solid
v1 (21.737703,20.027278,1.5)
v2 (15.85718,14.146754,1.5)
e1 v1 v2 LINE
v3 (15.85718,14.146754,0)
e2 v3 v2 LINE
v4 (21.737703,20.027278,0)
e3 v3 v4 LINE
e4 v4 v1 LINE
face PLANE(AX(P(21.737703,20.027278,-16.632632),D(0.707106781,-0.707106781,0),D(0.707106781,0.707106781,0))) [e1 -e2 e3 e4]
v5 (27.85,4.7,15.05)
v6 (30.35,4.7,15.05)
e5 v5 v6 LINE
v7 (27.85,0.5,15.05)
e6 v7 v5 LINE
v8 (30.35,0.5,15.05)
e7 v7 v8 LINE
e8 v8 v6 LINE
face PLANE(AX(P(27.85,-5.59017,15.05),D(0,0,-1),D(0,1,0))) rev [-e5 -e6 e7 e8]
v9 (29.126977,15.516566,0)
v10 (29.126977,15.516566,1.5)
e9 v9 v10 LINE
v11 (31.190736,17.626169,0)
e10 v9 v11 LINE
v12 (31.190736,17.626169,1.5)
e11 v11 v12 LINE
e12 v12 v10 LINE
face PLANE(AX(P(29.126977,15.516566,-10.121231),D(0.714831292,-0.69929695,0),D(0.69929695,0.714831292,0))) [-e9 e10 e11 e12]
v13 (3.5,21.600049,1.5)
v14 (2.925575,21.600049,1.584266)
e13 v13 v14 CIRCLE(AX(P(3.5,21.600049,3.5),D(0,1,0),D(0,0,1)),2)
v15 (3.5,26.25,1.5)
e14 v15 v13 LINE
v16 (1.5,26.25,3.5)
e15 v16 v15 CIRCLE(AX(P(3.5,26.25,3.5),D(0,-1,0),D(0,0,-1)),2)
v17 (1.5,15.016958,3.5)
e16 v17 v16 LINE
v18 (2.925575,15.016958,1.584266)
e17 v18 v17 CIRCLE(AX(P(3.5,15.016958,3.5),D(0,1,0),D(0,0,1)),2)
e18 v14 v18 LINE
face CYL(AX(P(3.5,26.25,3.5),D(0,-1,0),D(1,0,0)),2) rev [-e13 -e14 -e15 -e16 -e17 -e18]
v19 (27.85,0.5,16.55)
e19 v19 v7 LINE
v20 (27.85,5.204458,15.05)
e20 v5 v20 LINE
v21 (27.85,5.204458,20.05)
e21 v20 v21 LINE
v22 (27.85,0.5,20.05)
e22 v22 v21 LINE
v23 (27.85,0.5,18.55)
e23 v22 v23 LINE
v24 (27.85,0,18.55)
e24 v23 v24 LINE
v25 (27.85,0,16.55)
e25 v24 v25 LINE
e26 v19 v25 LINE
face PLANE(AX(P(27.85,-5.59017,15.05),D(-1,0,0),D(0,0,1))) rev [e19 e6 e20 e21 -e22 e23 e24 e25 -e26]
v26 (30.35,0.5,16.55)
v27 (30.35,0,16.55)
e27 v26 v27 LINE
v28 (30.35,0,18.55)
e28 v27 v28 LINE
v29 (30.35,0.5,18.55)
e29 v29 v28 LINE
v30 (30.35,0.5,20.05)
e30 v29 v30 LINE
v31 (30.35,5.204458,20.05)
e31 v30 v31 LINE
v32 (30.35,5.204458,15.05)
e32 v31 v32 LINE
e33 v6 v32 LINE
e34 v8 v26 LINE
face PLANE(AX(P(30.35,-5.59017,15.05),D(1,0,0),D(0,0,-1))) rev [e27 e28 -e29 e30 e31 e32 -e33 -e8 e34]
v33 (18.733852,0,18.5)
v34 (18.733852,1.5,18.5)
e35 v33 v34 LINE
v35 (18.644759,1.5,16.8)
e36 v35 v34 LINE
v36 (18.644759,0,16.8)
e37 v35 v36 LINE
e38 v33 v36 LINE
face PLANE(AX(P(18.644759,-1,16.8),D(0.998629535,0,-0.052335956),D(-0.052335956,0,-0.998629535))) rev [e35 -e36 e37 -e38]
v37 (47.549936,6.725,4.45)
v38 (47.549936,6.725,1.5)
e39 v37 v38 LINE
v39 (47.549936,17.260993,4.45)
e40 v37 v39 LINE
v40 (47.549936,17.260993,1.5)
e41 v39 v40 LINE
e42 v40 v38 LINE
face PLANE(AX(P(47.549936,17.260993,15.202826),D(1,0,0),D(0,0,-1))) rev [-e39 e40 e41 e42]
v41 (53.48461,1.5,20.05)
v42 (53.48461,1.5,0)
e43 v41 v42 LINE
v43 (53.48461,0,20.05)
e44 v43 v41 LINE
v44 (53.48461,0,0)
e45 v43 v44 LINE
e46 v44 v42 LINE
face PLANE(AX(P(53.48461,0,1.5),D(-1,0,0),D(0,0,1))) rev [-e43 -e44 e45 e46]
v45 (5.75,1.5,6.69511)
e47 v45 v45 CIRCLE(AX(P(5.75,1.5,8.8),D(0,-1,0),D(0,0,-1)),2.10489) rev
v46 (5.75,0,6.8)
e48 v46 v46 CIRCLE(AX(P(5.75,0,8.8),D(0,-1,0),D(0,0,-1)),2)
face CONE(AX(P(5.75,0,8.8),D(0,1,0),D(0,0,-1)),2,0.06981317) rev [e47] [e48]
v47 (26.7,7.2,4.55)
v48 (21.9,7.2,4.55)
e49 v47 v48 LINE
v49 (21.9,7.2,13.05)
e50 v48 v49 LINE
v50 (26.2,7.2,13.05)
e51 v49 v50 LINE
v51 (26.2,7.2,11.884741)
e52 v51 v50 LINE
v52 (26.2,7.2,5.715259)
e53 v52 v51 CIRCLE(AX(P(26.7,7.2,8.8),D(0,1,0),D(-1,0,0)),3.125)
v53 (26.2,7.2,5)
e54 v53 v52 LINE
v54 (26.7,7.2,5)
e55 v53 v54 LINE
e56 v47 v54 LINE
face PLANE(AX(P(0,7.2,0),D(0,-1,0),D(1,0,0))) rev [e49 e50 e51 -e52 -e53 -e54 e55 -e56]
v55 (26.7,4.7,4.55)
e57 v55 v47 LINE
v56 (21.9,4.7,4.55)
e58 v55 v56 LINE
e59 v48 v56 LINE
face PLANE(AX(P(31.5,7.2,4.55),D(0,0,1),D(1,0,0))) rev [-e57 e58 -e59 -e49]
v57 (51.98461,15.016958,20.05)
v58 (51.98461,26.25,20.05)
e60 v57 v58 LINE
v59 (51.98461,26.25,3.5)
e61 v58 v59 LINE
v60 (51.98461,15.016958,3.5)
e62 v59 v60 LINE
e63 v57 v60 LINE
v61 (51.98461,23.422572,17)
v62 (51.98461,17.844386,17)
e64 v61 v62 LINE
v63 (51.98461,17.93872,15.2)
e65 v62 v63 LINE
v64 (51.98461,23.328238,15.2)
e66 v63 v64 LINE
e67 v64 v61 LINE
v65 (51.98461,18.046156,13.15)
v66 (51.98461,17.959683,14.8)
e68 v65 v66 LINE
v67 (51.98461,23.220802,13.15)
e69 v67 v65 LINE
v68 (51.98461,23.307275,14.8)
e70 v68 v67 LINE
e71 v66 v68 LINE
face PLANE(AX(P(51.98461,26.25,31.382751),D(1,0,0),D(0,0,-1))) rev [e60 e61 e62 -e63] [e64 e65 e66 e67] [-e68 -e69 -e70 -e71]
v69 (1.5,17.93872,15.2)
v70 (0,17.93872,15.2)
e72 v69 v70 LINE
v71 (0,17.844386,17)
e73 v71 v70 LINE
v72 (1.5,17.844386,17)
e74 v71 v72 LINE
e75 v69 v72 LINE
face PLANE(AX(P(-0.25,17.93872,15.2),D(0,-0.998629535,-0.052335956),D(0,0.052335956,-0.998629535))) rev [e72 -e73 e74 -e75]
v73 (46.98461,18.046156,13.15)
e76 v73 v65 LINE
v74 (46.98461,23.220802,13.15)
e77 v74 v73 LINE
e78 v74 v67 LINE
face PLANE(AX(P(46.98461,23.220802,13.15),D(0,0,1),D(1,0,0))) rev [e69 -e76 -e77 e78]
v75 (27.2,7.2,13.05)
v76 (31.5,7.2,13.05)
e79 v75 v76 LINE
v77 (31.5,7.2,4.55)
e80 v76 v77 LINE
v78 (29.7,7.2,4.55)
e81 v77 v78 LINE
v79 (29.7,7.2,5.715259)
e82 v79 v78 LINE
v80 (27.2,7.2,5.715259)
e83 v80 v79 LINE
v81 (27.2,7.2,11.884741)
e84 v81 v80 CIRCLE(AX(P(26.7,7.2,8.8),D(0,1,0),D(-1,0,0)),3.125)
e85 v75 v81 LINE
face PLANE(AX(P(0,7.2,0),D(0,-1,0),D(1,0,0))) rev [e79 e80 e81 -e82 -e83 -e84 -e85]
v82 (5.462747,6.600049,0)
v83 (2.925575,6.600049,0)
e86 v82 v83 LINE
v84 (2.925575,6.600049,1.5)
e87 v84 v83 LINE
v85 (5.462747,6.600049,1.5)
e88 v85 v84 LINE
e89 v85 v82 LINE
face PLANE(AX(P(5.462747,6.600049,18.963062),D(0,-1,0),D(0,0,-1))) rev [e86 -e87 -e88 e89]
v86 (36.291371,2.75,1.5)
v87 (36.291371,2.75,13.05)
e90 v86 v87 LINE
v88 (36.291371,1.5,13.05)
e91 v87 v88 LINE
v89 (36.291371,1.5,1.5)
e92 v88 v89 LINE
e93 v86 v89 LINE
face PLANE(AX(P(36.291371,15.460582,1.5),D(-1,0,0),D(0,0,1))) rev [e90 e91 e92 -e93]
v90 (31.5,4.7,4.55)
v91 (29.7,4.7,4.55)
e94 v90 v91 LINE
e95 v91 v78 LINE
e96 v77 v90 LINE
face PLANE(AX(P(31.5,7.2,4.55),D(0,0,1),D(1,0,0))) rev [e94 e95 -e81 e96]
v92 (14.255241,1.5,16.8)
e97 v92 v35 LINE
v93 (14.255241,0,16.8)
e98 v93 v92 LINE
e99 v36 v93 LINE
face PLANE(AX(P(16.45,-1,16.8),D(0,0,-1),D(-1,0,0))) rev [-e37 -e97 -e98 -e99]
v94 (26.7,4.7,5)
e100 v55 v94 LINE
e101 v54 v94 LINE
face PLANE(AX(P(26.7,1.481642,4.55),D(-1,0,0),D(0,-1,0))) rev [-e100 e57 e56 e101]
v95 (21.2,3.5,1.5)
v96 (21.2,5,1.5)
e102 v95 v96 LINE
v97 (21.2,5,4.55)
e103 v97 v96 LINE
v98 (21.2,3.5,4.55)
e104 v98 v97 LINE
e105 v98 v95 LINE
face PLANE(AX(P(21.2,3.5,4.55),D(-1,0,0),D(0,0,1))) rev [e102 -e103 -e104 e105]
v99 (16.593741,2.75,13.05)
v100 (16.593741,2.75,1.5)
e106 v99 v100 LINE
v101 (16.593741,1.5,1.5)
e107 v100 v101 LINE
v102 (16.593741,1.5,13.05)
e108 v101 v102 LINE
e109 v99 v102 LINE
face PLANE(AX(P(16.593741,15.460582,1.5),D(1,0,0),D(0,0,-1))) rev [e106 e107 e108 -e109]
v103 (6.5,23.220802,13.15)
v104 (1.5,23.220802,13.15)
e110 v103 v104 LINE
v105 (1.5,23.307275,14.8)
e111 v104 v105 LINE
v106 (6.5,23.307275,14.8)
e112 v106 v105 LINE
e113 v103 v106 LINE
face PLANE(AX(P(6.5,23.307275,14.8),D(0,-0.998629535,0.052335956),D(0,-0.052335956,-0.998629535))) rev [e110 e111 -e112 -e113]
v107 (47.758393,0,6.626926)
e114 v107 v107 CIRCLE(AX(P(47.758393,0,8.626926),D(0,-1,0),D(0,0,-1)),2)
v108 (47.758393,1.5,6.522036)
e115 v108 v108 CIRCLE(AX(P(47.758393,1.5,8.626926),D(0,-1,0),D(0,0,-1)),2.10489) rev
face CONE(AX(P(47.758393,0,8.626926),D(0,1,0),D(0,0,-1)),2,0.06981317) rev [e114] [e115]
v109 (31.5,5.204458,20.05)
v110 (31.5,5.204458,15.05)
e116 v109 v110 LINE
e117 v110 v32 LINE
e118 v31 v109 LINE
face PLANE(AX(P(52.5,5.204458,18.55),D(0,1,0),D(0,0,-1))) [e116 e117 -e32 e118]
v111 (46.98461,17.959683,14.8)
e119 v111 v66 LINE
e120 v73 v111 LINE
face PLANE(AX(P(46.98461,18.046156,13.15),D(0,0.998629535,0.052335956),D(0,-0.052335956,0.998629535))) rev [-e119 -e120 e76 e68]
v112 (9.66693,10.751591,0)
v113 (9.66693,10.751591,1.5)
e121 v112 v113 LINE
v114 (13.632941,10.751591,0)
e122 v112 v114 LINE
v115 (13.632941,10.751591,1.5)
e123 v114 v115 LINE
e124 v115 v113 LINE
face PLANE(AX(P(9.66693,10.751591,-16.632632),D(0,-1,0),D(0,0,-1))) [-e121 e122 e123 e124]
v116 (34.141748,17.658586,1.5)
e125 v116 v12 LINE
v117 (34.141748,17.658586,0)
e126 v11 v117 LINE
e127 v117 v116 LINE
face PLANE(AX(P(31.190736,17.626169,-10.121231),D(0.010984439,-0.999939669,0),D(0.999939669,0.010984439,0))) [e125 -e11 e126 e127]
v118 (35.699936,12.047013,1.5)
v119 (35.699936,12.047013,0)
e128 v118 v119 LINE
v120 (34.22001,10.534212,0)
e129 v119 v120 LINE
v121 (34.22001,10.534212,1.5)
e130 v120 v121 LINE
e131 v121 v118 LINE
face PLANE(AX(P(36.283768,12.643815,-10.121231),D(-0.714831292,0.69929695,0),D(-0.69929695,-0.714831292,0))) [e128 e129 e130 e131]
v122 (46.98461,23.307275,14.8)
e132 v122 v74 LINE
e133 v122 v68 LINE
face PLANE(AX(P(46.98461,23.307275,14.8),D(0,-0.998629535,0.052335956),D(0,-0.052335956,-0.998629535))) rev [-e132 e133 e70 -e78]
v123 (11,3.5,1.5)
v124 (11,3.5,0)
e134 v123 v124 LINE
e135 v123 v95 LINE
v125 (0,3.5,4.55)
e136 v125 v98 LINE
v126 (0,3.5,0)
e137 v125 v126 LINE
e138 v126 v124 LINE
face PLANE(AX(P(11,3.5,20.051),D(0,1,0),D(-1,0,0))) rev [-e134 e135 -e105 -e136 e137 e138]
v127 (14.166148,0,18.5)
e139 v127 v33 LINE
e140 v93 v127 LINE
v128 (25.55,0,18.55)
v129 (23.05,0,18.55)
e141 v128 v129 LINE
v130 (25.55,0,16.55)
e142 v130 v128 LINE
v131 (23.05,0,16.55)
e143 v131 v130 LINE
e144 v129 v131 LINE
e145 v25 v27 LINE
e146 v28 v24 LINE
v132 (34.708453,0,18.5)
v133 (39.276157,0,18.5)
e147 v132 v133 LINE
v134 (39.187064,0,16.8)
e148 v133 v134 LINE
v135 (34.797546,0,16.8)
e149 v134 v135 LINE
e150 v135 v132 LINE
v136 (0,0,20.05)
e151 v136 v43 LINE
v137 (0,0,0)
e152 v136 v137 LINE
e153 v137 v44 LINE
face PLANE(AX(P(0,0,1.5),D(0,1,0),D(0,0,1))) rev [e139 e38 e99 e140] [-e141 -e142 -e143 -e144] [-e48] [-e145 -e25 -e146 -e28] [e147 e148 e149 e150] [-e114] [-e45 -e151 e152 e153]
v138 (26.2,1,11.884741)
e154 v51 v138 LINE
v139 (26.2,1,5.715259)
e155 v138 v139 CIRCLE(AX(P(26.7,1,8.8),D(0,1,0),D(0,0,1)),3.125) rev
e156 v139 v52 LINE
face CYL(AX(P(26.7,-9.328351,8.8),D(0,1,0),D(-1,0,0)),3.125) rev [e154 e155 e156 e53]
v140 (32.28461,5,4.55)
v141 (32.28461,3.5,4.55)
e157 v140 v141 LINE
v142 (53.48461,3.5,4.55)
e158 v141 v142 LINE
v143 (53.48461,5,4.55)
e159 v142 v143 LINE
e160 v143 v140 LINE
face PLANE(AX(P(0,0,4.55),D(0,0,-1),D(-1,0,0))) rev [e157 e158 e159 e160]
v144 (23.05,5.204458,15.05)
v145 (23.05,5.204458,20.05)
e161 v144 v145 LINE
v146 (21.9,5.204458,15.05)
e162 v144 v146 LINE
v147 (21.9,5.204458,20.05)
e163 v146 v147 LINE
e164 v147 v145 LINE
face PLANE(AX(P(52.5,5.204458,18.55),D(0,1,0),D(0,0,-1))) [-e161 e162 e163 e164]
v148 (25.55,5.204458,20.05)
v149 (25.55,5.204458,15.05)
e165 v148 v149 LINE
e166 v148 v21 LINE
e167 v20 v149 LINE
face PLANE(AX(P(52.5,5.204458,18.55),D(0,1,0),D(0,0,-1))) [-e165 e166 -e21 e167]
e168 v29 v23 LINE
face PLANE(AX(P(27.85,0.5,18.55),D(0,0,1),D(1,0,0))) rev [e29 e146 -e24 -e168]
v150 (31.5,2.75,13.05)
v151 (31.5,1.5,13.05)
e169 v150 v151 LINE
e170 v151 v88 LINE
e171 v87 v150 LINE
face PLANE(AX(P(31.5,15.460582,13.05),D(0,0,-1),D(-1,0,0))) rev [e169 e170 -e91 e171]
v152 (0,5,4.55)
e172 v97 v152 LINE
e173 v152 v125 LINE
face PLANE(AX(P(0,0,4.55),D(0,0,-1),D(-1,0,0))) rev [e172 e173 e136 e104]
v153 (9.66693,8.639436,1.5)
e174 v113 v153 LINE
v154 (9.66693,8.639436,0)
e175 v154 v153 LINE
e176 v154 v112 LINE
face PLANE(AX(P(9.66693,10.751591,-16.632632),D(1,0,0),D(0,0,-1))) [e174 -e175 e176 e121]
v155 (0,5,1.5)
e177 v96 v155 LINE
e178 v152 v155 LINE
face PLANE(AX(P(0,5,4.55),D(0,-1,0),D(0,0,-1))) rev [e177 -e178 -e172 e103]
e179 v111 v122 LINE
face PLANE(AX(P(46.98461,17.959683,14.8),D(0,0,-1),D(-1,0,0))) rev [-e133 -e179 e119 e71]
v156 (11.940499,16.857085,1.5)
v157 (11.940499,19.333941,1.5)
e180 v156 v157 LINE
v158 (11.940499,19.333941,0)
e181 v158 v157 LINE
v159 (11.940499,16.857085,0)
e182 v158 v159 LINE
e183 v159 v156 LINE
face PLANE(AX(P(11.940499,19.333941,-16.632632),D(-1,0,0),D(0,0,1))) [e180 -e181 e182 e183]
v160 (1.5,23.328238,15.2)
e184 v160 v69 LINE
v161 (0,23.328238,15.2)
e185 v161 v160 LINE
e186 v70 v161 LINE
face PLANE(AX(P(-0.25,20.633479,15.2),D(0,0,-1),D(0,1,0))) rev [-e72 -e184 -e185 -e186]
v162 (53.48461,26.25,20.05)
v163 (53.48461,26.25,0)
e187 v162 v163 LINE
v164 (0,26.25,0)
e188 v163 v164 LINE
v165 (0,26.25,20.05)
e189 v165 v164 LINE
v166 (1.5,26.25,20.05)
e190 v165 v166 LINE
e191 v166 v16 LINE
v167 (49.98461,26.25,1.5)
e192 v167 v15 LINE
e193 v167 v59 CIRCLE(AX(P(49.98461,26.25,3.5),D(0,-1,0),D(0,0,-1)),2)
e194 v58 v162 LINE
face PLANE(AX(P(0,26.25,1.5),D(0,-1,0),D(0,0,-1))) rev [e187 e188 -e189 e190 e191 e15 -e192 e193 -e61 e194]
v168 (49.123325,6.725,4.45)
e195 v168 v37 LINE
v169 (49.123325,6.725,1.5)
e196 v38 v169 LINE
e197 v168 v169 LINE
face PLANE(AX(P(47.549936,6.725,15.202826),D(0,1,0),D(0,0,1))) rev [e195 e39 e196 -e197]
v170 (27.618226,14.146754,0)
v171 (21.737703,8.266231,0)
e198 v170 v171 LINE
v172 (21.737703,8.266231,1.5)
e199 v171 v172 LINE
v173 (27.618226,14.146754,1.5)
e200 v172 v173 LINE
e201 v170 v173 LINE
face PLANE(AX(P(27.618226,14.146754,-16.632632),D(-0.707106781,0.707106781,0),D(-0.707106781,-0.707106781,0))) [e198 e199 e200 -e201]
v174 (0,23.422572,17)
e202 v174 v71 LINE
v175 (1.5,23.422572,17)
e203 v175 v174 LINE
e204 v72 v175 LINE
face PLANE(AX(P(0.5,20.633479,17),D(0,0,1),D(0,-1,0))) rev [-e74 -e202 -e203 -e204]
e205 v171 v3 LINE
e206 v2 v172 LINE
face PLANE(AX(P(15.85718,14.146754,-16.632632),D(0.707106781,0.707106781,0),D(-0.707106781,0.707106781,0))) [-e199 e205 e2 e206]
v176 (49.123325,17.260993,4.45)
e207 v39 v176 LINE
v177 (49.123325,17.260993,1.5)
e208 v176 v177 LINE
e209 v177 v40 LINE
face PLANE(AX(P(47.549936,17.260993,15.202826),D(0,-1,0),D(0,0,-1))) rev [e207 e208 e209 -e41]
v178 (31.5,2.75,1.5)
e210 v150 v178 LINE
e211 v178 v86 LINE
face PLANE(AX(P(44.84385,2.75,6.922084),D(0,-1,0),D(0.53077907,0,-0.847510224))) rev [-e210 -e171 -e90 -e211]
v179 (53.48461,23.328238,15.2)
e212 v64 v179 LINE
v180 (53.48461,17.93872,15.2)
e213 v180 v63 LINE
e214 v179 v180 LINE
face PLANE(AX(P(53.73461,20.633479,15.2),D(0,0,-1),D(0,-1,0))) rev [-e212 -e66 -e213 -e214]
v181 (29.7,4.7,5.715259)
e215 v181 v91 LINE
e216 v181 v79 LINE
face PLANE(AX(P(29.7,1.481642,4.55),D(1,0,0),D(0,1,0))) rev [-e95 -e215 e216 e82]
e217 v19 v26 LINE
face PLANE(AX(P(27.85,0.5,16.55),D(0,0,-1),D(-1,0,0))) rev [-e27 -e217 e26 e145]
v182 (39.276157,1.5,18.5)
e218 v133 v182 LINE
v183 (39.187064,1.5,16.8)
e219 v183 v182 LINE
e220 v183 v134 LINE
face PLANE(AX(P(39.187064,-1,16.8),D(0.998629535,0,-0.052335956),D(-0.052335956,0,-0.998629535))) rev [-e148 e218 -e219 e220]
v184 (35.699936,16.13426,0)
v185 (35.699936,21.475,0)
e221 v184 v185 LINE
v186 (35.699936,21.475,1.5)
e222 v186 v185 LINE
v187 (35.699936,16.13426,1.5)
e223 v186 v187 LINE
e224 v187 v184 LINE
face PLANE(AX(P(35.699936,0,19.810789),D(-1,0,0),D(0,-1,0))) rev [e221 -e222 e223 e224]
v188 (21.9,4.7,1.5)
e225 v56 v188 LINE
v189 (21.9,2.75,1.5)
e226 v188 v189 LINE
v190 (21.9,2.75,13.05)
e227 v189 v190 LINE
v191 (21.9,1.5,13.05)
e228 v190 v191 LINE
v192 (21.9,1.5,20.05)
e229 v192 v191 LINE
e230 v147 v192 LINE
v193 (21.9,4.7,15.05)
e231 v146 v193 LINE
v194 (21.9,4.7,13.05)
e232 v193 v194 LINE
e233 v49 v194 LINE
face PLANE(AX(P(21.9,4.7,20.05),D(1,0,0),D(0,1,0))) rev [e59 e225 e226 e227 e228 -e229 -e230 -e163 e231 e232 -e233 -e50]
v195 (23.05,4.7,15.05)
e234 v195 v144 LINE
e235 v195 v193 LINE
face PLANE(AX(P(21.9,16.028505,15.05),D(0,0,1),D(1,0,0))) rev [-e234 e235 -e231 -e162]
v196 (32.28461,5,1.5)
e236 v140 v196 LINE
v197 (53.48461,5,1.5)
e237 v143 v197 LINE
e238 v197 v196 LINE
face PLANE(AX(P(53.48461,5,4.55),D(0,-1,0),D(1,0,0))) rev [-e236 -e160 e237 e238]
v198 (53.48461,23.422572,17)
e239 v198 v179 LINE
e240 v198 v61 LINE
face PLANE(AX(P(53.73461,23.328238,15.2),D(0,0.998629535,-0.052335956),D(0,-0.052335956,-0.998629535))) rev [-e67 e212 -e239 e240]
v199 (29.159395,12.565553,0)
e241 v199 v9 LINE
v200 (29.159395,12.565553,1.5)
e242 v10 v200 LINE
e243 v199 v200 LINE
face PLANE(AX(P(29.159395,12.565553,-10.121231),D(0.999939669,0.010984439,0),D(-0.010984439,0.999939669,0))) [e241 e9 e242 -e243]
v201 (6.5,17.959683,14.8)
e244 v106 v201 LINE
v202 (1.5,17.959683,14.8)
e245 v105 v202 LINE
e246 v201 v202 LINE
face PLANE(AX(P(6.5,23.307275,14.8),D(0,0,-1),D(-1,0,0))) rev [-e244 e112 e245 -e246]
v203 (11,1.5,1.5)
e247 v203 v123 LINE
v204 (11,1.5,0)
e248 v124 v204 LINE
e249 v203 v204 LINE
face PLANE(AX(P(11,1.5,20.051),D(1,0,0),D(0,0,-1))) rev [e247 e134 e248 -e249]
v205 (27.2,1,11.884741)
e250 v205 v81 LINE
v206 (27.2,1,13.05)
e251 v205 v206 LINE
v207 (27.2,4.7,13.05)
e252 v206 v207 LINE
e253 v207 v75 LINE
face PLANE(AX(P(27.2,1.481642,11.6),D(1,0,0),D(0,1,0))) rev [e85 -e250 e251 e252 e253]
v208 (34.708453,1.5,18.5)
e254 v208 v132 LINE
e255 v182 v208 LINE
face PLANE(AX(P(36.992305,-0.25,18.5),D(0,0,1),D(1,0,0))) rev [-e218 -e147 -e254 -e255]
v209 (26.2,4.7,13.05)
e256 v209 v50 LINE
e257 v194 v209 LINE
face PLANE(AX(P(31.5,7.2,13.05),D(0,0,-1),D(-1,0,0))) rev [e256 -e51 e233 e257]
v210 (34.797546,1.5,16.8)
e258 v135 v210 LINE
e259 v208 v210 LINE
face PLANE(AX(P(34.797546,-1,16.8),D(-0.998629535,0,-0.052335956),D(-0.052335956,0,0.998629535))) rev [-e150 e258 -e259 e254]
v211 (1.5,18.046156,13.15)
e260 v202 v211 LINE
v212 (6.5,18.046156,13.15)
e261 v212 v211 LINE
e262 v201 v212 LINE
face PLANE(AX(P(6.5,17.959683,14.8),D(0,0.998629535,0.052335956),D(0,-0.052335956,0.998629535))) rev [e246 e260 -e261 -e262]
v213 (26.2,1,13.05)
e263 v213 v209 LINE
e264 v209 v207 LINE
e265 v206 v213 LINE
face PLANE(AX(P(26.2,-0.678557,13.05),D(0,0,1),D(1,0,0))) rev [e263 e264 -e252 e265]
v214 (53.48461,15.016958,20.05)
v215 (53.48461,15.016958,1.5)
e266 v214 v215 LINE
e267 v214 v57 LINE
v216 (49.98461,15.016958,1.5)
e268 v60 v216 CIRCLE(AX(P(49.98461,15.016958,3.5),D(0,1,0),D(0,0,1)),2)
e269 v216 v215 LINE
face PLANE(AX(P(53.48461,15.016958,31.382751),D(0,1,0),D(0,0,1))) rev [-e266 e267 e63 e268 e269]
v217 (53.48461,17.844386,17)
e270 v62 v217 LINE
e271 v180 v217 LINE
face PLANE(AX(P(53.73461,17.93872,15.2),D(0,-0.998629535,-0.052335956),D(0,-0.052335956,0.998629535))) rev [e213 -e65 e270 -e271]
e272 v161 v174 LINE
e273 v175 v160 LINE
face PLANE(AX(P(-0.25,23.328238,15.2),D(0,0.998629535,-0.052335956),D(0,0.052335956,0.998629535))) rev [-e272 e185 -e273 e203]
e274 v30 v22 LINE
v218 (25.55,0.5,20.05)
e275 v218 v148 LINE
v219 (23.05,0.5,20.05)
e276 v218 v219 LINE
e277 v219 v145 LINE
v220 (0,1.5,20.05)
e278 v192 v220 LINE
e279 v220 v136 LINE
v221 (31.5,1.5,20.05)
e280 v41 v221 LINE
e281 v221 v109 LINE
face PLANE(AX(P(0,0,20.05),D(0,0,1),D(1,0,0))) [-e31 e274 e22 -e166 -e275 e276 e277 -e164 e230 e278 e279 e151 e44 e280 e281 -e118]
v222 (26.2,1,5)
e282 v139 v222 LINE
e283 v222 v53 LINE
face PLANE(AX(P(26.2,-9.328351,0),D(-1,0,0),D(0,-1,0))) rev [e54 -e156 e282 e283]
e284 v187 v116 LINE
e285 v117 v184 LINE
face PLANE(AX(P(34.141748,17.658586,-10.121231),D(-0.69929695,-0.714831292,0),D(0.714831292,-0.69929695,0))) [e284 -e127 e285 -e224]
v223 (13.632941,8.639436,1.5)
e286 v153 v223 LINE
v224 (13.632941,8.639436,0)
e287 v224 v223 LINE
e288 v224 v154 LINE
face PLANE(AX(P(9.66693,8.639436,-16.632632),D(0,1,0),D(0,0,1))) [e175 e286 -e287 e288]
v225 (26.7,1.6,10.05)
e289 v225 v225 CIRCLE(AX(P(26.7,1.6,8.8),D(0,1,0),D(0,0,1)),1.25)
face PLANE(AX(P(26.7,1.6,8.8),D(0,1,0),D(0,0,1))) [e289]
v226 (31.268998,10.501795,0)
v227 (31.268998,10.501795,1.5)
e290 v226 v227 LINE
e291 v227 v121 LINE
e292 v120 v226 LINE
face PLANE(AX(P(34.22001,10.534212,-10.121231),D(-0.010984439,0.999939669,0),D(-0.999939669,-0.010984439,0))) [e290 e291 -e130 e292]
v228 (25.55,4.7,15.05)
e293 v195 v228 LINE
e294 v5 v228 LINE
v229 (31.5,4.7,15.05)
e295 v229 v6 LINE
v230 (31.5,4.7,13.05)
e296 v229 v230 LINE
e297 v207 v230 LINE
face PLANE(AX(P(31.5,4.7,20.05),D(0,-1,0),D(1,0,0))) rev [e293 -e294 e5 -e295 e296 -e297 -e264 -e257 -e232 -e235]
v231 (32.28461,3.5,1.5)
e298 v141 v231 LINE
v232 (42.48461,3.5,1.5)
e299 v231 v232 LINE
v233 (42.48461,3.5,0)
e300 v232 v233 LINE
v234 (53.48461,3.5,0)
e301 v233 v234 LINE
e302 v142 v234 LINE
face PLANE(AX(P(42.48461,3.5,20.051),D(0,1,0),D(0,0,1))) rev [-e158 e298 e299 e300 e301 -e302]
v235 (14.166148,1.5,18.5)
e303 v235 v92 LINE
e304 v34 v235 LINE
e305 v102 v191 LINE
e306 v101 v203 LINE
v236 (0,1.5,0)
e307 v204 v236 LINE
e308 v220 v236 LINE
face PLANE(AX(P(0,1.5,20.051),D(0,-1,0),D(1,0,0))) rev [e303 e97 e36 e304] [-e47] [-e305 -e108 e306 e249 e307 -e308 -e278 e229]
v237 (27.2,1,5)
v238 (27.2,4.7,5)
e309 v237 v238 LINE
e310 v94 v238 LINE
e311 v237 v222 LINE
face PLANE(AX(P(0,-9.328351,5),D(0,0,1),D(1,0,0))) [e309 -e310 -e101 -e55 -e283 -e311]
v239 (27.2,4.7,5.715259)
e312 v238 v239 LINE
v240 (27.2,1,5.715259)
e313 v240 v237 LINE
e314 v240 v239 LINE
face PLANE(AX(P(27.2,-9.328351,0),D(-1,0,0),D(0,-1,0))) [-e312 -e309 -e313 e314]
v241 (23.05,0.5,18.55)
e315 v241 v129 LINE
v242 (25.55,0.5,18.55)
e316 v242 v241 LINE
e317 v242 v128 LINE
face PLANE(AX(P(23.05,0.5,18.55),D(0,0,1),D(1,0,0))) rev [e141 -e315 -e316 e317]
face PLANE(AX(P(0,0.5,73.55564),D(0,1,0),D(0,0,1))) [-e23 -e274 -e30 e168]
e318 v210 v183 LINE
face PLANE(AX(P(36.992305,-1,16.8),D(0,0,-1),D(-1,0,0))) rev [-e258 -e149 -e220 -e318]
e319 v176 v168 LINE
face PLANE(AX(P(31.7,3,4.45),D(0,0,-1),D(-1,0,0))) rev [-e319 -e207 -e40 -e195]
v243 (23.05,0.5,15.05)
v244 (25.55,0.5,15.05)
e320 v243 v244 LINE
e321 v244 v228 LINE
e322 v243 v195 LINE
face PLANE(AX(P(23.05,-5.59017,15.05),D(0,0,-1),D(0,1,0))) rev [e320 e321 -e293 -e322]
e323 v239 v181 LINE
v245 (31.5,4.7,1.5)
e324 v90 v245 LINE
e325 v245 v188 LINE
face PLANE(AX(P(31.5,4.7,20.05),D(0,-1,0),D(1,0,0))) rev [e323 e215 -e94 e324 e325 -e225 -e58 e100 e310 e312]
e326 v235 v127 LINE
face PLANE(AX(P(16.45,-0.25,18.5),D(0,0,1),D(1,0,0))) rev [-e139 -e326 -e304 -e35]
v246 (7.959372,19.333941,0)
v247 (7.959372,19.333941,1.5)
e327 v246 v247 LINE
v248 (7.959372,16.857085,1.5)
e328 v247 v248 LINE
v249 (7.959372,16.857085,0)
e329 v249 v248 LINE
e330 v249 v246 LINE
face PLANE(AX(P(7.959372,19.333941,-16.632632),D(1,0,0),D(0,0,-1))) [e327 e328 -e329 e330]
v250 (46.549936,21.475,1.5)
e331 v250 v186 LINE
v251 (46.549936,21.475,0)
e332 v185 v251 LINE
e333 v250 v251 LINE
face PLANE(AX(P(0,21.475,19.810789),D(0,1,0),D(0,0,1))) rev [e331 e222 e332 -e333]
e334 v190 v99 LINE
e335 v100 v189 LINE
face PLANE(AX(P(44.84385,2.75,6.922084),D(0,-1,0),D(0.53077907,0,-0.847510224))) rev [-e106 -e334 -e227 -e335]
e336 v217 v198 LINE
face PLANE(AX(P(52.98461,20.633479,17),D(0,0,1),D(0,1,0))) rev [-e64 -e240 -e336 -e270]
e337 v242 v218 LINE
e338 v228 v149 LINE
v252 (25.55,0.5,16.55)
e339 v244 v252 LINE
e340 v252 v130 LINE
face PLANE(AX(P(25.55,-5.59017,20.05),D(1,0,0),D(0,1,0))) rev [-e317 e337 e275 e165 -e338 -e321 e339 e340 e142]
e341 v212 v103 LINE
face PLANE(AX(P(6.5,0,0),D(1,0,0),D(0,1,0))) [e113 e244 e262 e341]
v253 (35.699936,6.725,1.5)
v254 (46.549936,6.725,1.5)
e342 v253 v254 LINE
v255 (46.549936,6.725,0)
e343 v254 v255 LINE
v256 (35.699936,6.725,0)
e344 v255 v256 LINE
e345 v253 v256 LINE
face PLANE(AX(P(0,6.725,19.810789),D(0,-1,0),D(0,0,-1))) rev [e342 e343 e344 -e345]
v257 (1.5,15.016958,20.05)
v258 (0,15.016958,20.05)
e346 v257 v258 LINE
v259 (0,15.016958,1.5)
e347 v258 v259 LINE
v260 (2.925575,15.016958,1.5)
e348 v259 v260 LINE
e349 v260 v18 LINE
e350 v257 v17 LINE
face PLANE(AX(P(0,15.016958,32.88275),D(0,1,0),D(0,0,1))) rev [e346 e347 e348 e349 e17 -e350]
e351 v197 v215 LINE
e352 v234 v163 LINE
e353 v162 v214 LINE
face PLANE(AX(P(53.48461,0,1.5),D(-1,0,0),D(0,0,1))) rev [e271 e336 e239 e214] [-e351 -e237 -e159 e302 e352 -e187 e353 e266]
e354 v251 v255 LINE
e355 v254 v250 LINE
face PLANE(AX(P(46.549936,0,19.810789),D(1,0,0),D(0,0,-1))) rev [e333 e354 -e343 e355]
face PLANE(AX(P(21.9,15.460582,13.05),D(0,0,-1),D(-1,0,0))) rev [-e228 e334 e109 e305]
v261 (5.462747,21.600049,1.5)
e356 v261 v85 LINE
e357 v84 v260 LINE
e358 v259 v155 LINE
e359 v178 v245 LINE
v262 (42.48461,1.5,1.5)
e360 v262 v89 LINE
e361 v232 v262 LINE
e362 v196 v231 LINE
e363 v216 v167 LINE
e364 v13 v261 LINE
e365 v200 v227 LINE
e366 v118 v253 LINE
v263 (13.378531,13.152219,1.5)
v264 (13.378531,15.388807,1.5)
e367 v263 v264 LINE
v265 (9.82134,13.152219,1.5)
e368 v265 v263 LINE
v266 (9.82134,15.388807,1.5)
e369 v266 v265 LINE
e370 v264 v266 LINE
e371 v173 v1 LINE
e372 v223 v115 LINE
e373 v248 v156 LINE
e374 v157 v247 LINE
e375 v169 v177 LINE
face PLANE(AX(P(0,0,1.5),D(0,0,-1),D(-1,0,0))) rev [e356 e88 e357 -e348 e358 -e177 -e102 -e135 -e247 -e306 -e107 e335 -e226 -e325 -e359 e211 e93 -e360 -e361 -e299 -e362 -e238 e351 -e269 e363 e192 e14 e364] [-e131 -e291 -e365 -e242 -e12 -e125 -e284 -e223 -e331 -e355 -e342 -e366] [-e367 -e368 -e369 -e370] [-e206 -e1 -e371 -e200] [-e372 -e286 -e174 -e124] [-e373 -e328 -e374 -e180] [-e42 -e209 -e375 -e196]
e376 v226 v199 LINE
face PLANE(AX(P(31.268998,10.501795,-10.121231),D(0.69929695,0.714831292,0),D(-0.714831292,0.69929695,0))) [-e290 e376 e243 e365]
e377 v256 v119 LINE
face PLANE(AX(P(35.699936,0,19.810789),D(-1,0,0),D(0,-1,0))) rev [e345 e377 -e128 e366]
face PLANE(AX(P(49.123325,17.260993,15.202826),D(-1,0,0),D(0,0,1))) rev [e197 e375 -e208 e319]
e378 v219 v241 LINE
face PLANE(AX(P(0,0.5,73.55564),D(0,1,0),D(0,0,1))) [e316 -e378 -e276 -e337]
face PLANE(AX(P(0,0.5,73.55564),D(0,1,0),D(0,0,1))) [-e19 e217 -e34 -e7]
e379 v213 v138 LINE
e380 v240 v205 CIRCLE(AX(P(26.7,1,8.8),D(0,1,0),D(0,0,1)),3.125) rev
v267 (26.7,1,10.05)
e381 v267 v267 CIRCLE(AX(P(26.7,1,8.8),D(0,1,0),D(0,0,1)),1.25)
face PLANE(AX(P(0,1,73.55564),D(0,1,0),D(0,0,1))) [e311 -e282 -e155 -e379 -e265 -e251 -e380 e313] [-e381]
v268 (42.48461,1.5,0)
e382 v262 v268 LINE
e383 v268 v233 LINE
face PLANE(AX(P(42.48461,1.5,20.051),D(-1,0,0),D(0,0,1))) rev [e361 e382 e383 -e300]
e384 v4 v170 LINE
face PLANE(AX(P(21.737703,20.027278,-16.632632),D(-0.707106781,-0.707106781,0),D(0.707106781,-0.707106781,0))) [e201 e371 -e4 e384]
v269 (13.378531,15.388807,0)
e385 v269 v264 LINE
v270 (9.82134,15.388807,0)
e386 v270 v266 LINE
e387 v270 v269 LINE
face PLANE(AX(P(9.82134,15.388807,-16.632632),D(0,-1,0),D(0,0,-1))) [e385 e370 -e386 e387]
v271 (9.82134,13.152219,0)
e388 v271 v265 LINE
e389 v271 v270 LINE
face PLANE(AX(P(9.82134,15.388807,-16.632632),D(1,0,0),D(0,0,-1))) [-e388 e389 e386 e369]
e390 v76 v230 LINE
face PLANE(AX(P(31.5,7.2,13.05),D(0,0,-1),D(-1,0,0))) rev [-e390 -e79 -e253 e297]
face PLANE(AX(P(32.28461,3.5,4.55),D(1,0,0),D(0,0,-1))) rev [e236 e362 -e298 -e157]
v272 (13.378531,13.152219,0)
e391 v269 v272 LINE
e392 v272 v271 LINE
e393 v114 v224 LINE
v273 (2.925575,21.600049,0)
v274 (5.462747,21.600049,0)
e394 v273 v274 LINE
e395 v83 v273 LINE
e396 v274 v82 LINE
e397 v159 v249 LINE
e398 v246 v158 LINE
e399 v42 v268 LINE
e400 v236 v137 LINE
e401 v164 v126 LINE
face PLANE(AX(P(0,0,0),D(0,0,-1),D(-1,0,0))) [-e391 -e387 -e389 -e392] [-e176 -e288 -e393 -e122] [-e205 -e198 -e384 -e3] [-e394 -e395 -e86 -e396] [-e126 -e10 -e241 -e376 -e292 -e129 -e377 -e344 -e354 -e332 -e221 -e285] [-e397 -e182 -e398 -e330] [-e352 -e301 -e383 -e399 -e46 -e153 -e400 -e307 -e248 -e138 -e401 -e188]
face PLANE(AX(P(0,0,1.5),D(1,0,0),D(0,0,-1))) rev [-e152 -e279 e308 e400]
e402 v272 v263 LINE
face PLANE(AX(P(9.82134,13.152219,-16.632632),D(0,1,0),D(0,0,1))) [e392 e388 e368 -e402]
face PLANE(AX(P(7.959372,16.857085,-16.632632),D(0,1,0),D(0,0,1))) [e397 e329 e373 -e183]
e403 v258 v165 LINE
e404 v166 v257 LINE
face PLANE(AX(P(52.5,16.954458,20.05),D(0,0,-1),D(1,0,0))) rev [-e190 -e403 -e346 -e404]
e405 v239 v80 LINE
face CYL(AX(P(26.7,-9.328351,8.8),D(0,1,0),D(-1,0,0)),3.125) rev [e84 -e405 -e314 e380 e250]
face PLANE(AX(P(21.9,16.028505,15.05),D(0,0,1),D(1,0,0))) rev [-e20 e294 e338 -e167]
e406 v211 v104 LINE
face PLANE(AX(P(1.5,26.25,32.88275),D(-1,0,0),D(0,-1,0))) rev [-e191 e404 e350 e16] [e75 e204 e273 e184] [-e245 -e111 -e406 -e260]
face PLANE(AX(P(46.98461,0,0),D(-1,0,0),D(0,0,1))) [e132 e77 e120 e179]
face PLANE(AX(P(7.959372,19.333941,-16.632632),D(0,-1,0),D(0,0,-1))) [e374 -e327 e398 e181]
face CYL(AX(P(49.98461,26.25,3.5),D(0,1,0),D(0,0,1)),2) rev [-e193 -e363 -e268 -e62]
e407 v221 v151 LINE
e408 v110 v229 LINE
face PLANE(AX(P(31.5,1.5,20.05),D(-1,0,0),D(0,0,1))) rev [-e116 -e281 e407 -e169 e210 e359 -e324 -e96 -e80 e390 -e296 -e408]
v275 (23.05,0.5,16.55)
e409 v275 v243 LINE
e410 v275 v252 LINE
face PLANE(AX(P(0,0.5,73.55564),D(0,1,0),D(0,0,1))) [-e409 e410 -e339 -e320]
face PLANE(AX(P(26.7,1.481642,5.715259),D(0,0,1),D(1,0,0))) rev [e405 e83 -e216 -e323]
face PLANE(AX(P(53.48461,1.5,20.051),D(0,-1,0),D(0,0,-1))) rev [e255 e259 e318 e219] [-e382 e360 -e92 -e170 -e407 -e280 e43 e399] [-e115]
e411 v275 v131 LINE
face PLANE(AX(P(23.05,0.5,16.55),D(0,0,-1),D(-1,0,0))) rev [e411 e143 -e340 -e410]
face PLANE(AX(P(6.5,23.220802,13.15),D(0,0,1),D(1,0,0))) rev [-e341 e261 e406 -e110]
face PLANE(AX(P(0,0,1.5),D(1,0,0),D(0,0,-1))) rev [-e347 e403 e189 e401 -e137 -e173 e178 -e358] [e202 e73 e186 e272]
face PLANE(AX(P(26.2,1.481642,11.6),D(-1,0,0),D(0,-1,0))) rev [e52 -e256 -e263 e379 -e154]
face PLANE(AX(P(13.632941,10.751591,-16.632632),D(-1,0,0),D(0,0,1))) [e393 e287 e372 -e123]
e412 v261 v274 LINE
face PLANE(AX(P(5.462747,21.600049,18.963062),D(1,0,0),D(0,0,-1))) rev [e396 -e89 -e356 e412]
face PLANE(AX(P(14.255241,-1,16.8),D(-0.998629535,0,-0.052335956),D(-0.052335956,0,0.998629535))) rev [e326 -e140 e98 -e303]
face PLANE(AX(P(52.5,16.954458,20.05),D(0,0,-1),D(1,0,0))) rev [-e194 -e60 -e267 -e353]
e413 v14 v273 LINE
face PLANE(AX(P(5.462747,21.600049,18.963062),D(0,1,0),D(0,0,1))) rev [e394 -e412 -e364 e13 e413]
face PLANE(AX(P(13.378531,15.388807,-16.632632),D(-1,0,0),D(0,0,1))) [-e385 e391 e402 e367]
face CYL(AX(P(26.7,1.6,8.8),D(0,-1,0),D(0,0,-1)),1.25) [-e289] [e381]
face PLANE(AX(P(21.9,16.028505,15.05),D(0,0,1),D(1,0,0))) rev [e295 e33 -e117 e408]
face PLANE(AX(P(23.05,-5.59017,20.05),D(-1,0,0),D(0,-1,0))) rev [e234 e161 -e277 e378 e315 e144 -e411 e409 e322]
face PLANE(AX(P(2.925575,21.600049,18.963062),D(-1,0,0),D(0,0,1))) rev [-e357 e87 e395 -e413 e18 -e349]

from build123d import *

# Parameters (mm, degrees)
SKETCH1_W                              = 53.48460998
SKETCH1_H                              = 26.25
FRONT_SIDE_MAIN_DEPTH                  = 1.5
RESET_HOLE_DEPTH                       = 3.75
SKETCH15_W                             = 3.966010581
SKETCH15_H                             = 2.112155191
SKETCH15_W_2                           = 3.557190409
SKETCH15_H_2                           = 2.236587576
SKETCH15_W_3                           = 3.981127105
SKETCH15_H_3                           = 2.476855865
COMPONENT_HOLES_DEPTH                  = 3.75
SKETCH16_W                             = 10.85
SKETCH16_H                             = 14.75
MICROPHONE_HOLE_DEPTH                  = 1.5
SKETCH24_W                             = 1.5
SKETCH24_H                             = 11.233042059
RIGHT_SIDE_TOP_DEPTH                   = 18.55
SNAP_GROOVE_RIGHT_DEPTH                = 1.5
SKETCH26_W                             = 1.5
SKETCH26_H                             = 11.23304206
LEFT_SIDE_TOP_DEPTH                    = 18.55
SNAP_START                             = 51.98460998
SNAP_GROOVE_LEFT_DEPTH                 = 1.5
SKETCH20_W                             = 53.48460998
SKETCH20_H                             = 1.5
BOTTOM_BASE_DEPTH                      = 18.55
SERVO_START                            = -1.5
SKETCH18_W                             = 9.6
SKETCH18_H                             = 3.2
SERVO_SEPERATOR_BOTTOM_DEPTH           = 20.05
SKETCH34_W                             = 2.537171882
SKETCH34_H                             = 15
PROGRAMMING_HOLE_DEPTH                 = 3.75
SKETCH38_W                             = 9.6
SKETCH38_H                             = 5
BACK_BATTERY_HOLDER_BOTTOM_DEPTH       = 0.50445794
SKETCH40_R                             = 2
SERVO_ARM_HOLES_BOTTOM_DEPTH           = 1.5
SERVO_ARM_HOLES_BOTTOM_DRAFT           = 4
SERVO_ARM_HOLES_BOTTOM_PROFILE_2_DEPTH = 1.5
SERVO_ARM_HOLES_BOTTOM_PROFILE_2_DRAFT = 4
SKETCH47_W                             = 11
SKETCH47_H                             = 2
SOLAR_ARM_HOLES_FRONT_DEPTH            = 1.5
FILLET1_R                              = 2
SKETCH48_W                             = 9.6
SKETCH48_H                             = 8.5
SERVO_TALLER_SEPERATOR_BOTTOM_DEPTH    = 2.5
SKETCH49_W                             = 1.573389805
SKETCH49_H                             = 10.535992885
SERVO_2_CASE_SPACER_FRONT_DEPTH        = 2.95
SKETCH51_W                             = 4.791370676
SKETCH51_H                             = 11.55
SKETCH51_W_2                           = 5.306259021
SERVO_LIFTERS_BOTTOM_DEPTH             = 1.25
SKETCH52_W                             = 21.2
SKETCH52_H                             = 1.5
SERVO_UNDER_SUPPORT_DEPTH              = 3.05
SERVO_TOP_SUPPORT_RIGHT_DEPTH          = 5
SERVO_TOP_SUPPORT_LEFT_DEPTH           = 5
SNAP_GROOVE_BOTTOM_RIGHT_DEPTH         = 1.5
SNAP_GROOVE_BOTTOM_LEFT_DEPTH          = 1.5
VIBRATION_MOTOR_AND_WIRE_HOLES_DEPTH   = 6.2
SKETCH57_W                             = 3
SKETCH57_H                             = 1.16525933
SKETCH57_W_2                           = 1
SKETCH57_H_2                           = 1.45
VIBRATION_WIRE_ROUTING_HOLES_DEPTH     = 2.5
SKETCH60_W                             = 2.5
SKETCH60_H                             = 5
COPPER_HOLES_DEPTH                     = 4.70445794
SKETCH61_W                             = 2.5
SKETCH61_H                             = 2
CUT_EXTRUDE5_DEPTH                     = 0.5
SKETCH62_R                             = 1.25
BOSS_EXTRUDE1_DEPTH                    = 0.6
CUT_EXTRUDE7_START                     = -3.7
CUT_EXTRUDE7_DEPTH                     = 3.7


# Read off the part's stored shape, not the designer's step: Snap Groove - Right, Snap Groove - Left, Snap Groove - Bottom Right, Snap Groove - Bottom Left, Cut-Extrude7
with BuildPart() as part:
    # Sketch1 → Front Side - Main (new body)
    with BuildSketch(Plane.XY):
        with Locations((26.74230499, 13.125)):
            Rectangle(SKETCH1_W, SKETCH1_H)
    extrude(amount=FRONT_SIDE_MAIN_DEPTH)

    # Reset Hole Sketch → Reset Hole (cut)
    with BuildSketch(Plane(origin=(0, 0, 3.75), x_dir=(-1, 0, 0), z_dir=(0, 0, -1))):
        Polygon((-31.190735744, 17.626168756), (-34.141748042, 17.658585925), (-36.251351249, 15.594827519), (-36.283768419, 12.643815222), (-34.220010013, 10.534212015), (-31.268997715, 10.501794845), (-29.159394508, 12.565553251), (-29.126977338, 15.516565548), align=None)
    extrude(amount=RESET_HOLE_DEPTH, mode=Mode.SUBTRACT)

    # Sketch15 → Component Holes (cut)
    with BuildSketch(Plane(origin=(0, 0, 3.75), x_dir=(-1, 0, 0), z_dir=(0, 0, -1))):
        Polygon((-21.737702993, 20.027277789), (-15.857179586, 14.146754382), (-21.737702993, 8.266230975), (-27.6182264, 14.146754382), align=None)
        with Locations((-11.649935563, 9.695513201)):
            Rectangle(SKETCH15_W, SKETCH15_H)
        with Locations((-11.599935563, 14.270513201)):
            Rectangle(SKETCH15_W_2, SKETCH15_H_2)
        with Locations((-9.949935563, 18.095513201)):
            Rectangle(SKETCH15_W_3, SKETCH15_H_3)
    extrude(amount=COMPONENT_HOLES_DEPTH, mode=Mode.SUBTRACT)

    # Sketch16 → Microphone Hole (cut)
    with BuildSketch(Plane(origin=(0, 0, 0), x_dir=(-1, 0, 0), z_dir=(0, 0, -1))):
        with Locations((-41.124935562, 14.1)):
            Rectangle(SKETCH16_W, SKETCH16_H)
    extrude(amount=-MICROPHONE_HOLE_DEPTH, mode=Mode.SUBTRACT)

    # Sketch24 → Right Side - Top (add)
    with BuildSketch(Plane.XY.offset(1.5)):
        with Locations((0.75, 20.633478971)):
            Rectangle(SKETCH24_W, SKETCH24_H)
    extrude(amount=RIGHT_SIDE_TOP_DEPTH)

    # Snap Groove - Right outline → Snap Groove - Right (cut)
    with BuildSketch(Plane.YZ):
        Polygon((17.938719749, 15.2), (23.328238193, 15.2), (23.422572195, 17), (17.844385746, 17), align=None)
    extrude(amount=SNAP_GROOVE_RIGHT_DEPTH, mode=Mode.SUBTRACT)

    # Sketch26 → Left Side - Top (add)
    with BuildSketch(Plane.XY.offset(1.5)):
        with Locations((52.73460998, 20.63347897)):
            Rectangle(SKETCH26_W, SKETCH26_H)
    extrude(amount=LEFT_SIDE_TOP_DEPTH)

    # Snap Groove - Left outline → Snap Groove - Left (cut)
    with BuildSketch(Plane.YZ.offset(SNAP_START)):
        Polygon((17.938719748, 15.2), (23.328238192, 15.2), (23.422572195, 17), (17.844385746, 17), align=None)
    extrude(amount=SNAP_GROOVE_LEFT_DEPTH, mode=Mode.SUBTRACT)

    # Sketch18 → Servo Seperator - Bottom (add)
    with BuildSketch(Plane.XY.offset(1.5).offset(SERVO_START)):
        with Locations((26.7, 3.1)):
            Rectangle(SKETCH18_W, SKETCH18_H)
    extrude(amount=SERVO_SEPERATOR_BOTTOM_DEPTH)

    # Sketch34 → Programming Hole (cut)
    with BuildSketch(Plane(origin=(0, 0, 0), x_dir=(-1, 0, 0), z_dir=(0, 0, -1))):
        with Locations((-4.194161079, 14.100049249)):
            Rectangle(SKETCH34_W, SKETCH34_H)
    extrude(amount=-PROGRAMMING_HOLE_DEPTH, mode=Mode.SUBTRACT)

    # Sketch38 → Back Battery Holder - Bottom (add)
    with BuildSketch(Plane(origin=(0, 4.7, 0), x_dir=(1, 0, 0), z_dir=(0, 1, 0))):
        with Locations((26.7, -17.55)):
            Rectangle(SKETCH38_W, SKETCH38_H)
    extrude(amount=BACK_BATTERY_HOLDER_BOTTOM_DEPTH)

    # Sketch47 → Solar Arm Holes - Front (cut)
    with BuildSketch(Plane(origin=(0, 0, 0), x_dir=(-1, 0, 0), z_dir=(0, 0, -1))):
        with Locations((-47.98460998, 2.5)):
            Rectangle(SKETCH47_W, SKETCH47_H)
        with Locations((-5.5, 2.5)):
            Rectangle(SKETCH47_W, SKETCH47_H)
    extrude(amount=-SOLAR_ARM_HOLES_FRONT_DEPTH, mode=Mode.SUBTRACT)

    # Fillet1
    # the kernel refuses this fillet: 2 mm, written as the material it adds along each edge
    with BuildSketch(Plane(origin=(1.5, 26.25, 1.5), x_dir=(1, 0, 0), z_dir=(0, -1, 0))) as fillet1_piece_1_section:
        with BuildLine():
            CenterArc((FILLET1_R, FILLET1_R), FILLET1_R, 180, 90)
            Line((0, FILLET1_R), (0, 0))
            Line((0, 0), (FILLET1_R, 0))
        make_face()
    fillet1_piece_1 = extrude(amount=11.233042059, mode=Mode.PRIVATE)
    fillet1_piece_1 = split(fillet1_piece_1, bisect_by=Plane(origin=(3.153594052, 21.600049249, 1.498546269), z_dir=(0, 1, 0)), keep=Keep.TOP, mode=Mode.PRIVATE)
    fillet1_piece_1 = split(fillet1_piece_1, bisect_by=Plane(origin=(2.925575138, 23.925024625, 1.498546269), z_dir=(1, 0, 0)), keep=Keep.TOP, mode=Mode.PRIVATE)
    add(fillet1_piece_1)
    with BuildSketch(Plane(origin=(1.5, 26.25, 1.5), x_dir=(1, 0, 0), z_dir=(0, -1, 0))) as fillet1_piece_2_section:
        with BuildLine():
            CenterArc((FILLET1_R, FILLET1_R), FILLET1_R, 180, 90)
            Line((0, FILLET1_R), (0, 0))
            Line((0, 0), (FILLET1_R, 0))
        make_face()
    fillet1_piece_2 = extrude(amount=11.233042059, mode=Mode.PRIVATE)
    fillet1_piece_2 = split(fillet1_piece_2, bisect_by=Plane(origin=(1.90508607, 21.600049249, 1.970835912), z_dir=(0, 1, 0)), keep=Keep.TOP, mode=Mode.PRIVATE)
    fillet1_piece_2 = split(fillet1_piece_2, bisect_by=Plane(origin=(2.925575138, 23.925024625, 1.970835912), z_dir=(-1, 0, 0)), keep=Keep.TOP, mode=Mode.PRIVATE)
    add(fillet1_piece_2)
    with BuildSketch(Plane(origin=(1.5, 26.25, 1.5), x_dir=(1, 0, 0), z_dir=(0, -1, 0))) as fillet1_piece_3_section:
        with BuildLine():
            CenterArc((FILLET1_R, FILLET1_R), FILLET1_R, 180, 90)
            Line((0, FILLET1_R), (0, 0))
            Line((0, 0), (FILLET1_R, 0))
        make_face()
    fillet1_piece_3 = extrude(amount=11.233042059, mode=Mode.PRIVATE)
    fillet1_piece_3 = split(fillet1_piece_3, bisect_by=Plane(origin=(1.90508607, 21.600049249, 1.970835912), z_dir=(0, -1, 0)), keep=Keep.TOP, mode=Mode.PRIVATE)
    fillet1_piece_3 = split(fillet1_piece_3, bisect_by=Plane(origin=(2.925575138, 18.308503595, 1.970835912), z_dir=(-1, 0, 0)), keep=Keep.TOP, mode=Mode.PRIVATE)
    add(fillet1_piece_3)
    with BuildSketch(Plane(origin=(51.98460998, 26.25, 1.5), x_dir=(-1, 0, 0), z_dir=(0, -1, 0))) as fillet1_piece_4:
        with BuildLine():
            CenterArc((FILLET1_R, -FILLET1_R), FILLET1_R, 90, 90)
            Line((0, -FILLET1_R), (0, 0))
            Line((0, 0), (FILLET1_R, 0))
        make_face()
    extrude(amount=11.23304206)

    # Sketch48 → Servo Taller Seperator - Bottom (add)
    with BuildSketch(Plane(origin=(0, 4.7, 0), x_dir=(1, 0, 0), z_dir=(0, 1, 0))):
        with Locations((26.7, -8.8)):
            Rectangle(SKETCH48_W, SKETCH48_H)
    extrude(amount=SERVO_TALLER_SEPERATOR_BOTTOM_DEPTH)

    # Sketch49 → Servo 2 Case Spacer - Front (add)
    with BuildSketch(Plane.XY.offset(1.5)):
        with Locations((48.336630465, 11.992996443)):
            Rectangle(SKETCH49_W, SKETCH49_H)
    extrude(amount=SERVO_2_CASE_SPACER_FRONT_DEPTH)

    # Sketch51 → Servo Lifters - Bottom (add)
    with BuildSketch(Plane(origin=(0, 1.5, 0), x_dir=(1, 0, 0), z_dir=(0, 1, 0))):
        with Locations((33.895685338, -7.275)):
            Rectangle(SKETCH51_W, SKETCH51_H)
        with Locations((19.24687049, -7.275)):
            Rectangle(SKETCH51_W_2, SKETCH51_H)
    extrude(amount=SERVO_LIFTERS_BOTTOM_DEPTH)

    # Sketch52 → Servo Under Support (add)
    with BuildSketch(Plane.XY.offset(1.5)):
        with Locations((10.6, 4.25)):
            Rectangle(SKETCH52_W, SKETCH52_H)
        with Locations((42.88460998, 4.25)):
            Rectangle(SKETCH52_W, SKETCH52_H)
    extrude(amount=SERVO_UNDER_SUPPORT_DEPTH)

    # Sketch53 → Servo Top Support - Right (add)
    with BuildSketch(Plane(origin=(1.5, 0, 0), x_dir=(0, 0, -1), z_dir=(1, 0, 0))):
        Polygon((-14.8, 23.307275081), (-13.15, 23.220802245), (-13.15, 18.046155696), (-14.8, 17.95968286), align=None)
    extrude(amount=SERVO_TOP_SUPPORT_RIGHT_DEPTH)

    # Sketch55 → Servo Top Support - Left (add)
    with BuildSketch(Plane.ZY.offset(-51.98460998)):
        Polygon((14.8, 17.95968286), (14.8, 23.307275081), (13.15, 23.220802245), (13.15, 18.046155696), align=None)
    extrude(amount=SERVO_TOP_SUPPORT_LEFT_DEPTH)


with BuildPart() as body_2:
    # Sketch20 → Bottom Base (new body)
    with BuildSketch(Plane.XY.offset(1.5)):
        with Locations((26.74230499, 0.75)):
            Rectangle(SKETCH20_W, SKETCH20_H)
    extrude(amount=BOTTOM_BASE_DEPTH)


with BuildPart() as servo_arm_holes_bottom_tool:
    # Sketch40 → Servo arm Holes - Bottom (with draft: the straight prism first)
    with BuildSketch(Plane.XZ):
        with Locations((47.75839301, 8.62692576)):
            Circle(SKETCH40_R)
    extrude(amount=-SERVO_ARM_HOLES_BOTTOM_DEPTH)
    # Servo arm Holes - Bottom: the draft: its side faces are tilted about the plane it starts from
    servo_arm_holes_bottom_sides = [servo_arm_holes_bottom_tool.faces().sort_by_distance(p)[0] for p in [
        (45.75839301, 0.75, 8.62692576),
    ]]
    draft(servo_arm_holes_bottom_sides, Plane.XZ, SERVO_ARM_HOLES_BOTTOM_DRAFT)


with BuildPart() as body_2_1:
    add(body_2.part)

    # Servo arm Holes - Bottom: cut by servo_arm_holes_bottom_tool
    add(servo_arm_holes_bottom_tool.part, mode=Mode.SUBTRACT)


with BuildPart() as servo_arm_holes_bottom_profile_2_tool:
    # Sketch40 → Servo arm Holes - Bottom profile 2 (with draft: the straight prism first)
    with BuildSketch(Plane.XZ):
        with Locations((5.75, 8.8)):
            Circle(SKETCH40_R)
    extrude(amount=-SERVO_ARM_HOLES_BOTTOM_PROFILE_2_DEPTH)
    # Servo arm Holes - Bottom profile 2: the draft: its side faces are tilted about the plane it starts from
    servo_arm_holes_bottom_profile_2_sides = [servo_arm_holes_bottom_profile_2_tool.faces().sort_by_distance(p)[0] for p in [
        (3.75, 0.75, 8.8),
    ]]
    draft(servo_arm_holes_bottom_profile_2_sides, Plane.XZ, SERVO_ARM_HOLES_BOTTOM_PROFILE_2_DRAFT)


with BuildPart() as body_2_2:
    add(body_2_1.part)

    # Servo arm Holes - Bottom profile 2: cut by servo_arm_holes_bottom_profile_2_tool
    add(servo_arm_holes_bottom_profile_2_tool.part, mode=Mode.SUBTRACT)

    # Snap Groove - Bottom Right outline → Snap Groove - Bottom Right (cut)
    with BuildSketch(Plane(origin=(0, 0, 0), x_dir=(1, 0, 0), z_dir=(0, 1, 0))):
        Polygon((18.644759222, -16.8), (14.255240778, -16.8), (14.166147553, -18.5), (18.733852447, -18.5), align=None)
    extrude(amount=SNAP_GROOVE_BOTTOM_RIGHT_DEPTH, mode=Mode.SUBTRACT)

    # Snap Groove - Bottom Left outline → Snap Groove - Bottom Left (cut)
    with BuildSketch(Plane(origin=(0, 0, 0), x_dir=(1, 0, 0), z_dir=(0, 1, 0))):
        Polygon((39.276157437, -18.5), (39.187064212, -16.8), (34.797545768, -16.8), (34.708452543, -18.5), align=None)
    extrude(amount=SNAP_GROOVE_BOTTOM_LEFT_DEPTH, mode=Mode.SUBTRACT)


with BuildPart() as vibration_motor_and_wire_holes_tool:
    # Sketch56 → vibration motor and wire holes (new body)
    with BuildSketch(Plane(origin=(0, 7.2, 0), x_dir=(1, 0, 0), z_dir=(0, 1, 0))):
        with BuildLine():
            ThreePointArc((27.2, -5.71525933), (26.7, -5.675), (26.2, -5.71525933))
            Line((26.2, -5.71525933), (26.2, -6))
            Line((26.2, -6), (27.2, -6))
            Line((27.2, -6), (27.2, -5.71525933))
        make_face()
        with BuildLine():
            Line((26.2, -6), (26.2, -5.71525933))
            ThreePointArc((26.2, -5.71525933), (24.674768532, -11.179929096), (29.825, -8.8))
            ThreePointArc((29.825, -8.8), (29.079929096, -6.774768532), (27.2, -5.71525933))
            Line((27.2, -5.71525933), (27.2, -6))
            Line((27.2, -6), (26.2, -6))
        make_face()
        with BuildLine():
            Line((27.2, -5), (26.2, -5))
            Line((26.2, -5), (26.2, -5.71525933))
            ThreePointArc((26.2, -5.71525933), (26.7, -5.675), (27.2, -5.71525933))
            Line((27.2, -5.71525933), (27.2, -5))
        make_face()
    extrude(amount=-VIBRATION_MOTOR_AND_WIRE_HOLES_DEPTH)


with BuildPart() as part_1:
    add(part.part)

    # vibration motor and wire holes: cut by vibration_motor_and_wire_holes_tool
    add(vibration_motor_and_wire_holes_tool.part, mode=Mode.SUBTRACT)

    # Sketch57 → vibration wire routing holes (cut)
    with BuildSketch(Plane(origin=(0, 7.2, 0), x_dir=(1, 0, 0), z_dir=(0, 1, 0))):
        with Locations((28.2, -5.132629665)):
            Rectangle(SKETCH57_W, SKETCH57_H)
        with Locations((26.7, -12.325)):
            Rectangle(SKETCH57_W_2, SKETCH57_H_2)
    extrude(amount=-VIBRATION_WIRE_ROUTING_HOLES_DEPTH, mode=Mode.SUBTRACT)


with BuildPart() as body_2_3:
    add(body_2_2.part)

    # vibration motor and wire holes: cut by vibration_motor_and_wire_holes_tool
    add(vibration_motor_and_wire_holes_tool.part, mode=Mode.SUBTRACT)


with BuildPart() as copper_holes_tool:
    # Sketch60 → copper holes (new body)
    with BuildSketch(Plane(origin=(0, 5.20445794, 0), x_dir=(1, 0, 0), z_dir=(0, 1, 0))):
        with Locations((24.3, -17.55)):
            Rectangle(SKETCH60_W, SKETCH60_H)
        with Locations((29.1, -17.55)):
            Rectangle(SKETCH60_W, SKETCH60_H)
    extrude(amount=-COPPER_HOLES_DEPTH)


with BuildPart() as part_2:
    add(part_1.part)

    # copper holes: cut by copper_holes_tool
    add(copper_holes_tool.part, mode=Mode.SUBTRACT)



with BuildPart() as body_2_4:
    add(body_2_3.part)

    # copper holes: cut by copper_holes_tool
    add(copper_holes_tool.part, mode=Mode.SUBTRACT)

    # Sketch61 → Cut-Extrude5 (cut)
    with BuildSketch(Plane.XZ):
        with Locations((24.3, 17.55)):
            Rectangle(SKETCH61_W, SKETCH61_H)
        with Locations((29.1, 17.55)):
            Rectangle(SKETCH61_W, SKETCH61_H)
    extrude(amount=-CUT_EXTRUDE5_DEPTH, mode=Mode.SUBTRACT)


with BuildPart() as part_3:
    add(part_2.part)

    add(body_2_4.part)  # Boss-Extrude1 merges body 2
    # Sketch62 → Boss-Extrude1 (add)
    with BuildSketch(Plane(origin=(0, 1, 0), x_dir=(1, 0, 0), z_dir=(0, 1, 0))):
        with Locations(Location((26.7, -8.8, 0), (0, 0, 270))):
            Circle(SKETCH62_R)
    extrude(amount=BOSS_EXTRUDE1_DEPTH)

    # Cut-Extrude7 outline → Cut-Extrude7 (cut)
    with BuildSketch(Plane(origin=(0, 4.7, 0), x_dir=(1, 0, 0), z_dir=(0, 1, 0)).offset(CUT_EXTRUDE7_START)):
        with BuildLine():
            Line((26.2, -13.05), (27.2, -13.05))
            Line((27.2, -13.05), (27.2, -11.88474067))
            ThreePointArc((27.2, -11.88474067), (26.7, -11.925), (26.2, -11.88474067))
            Line((26.2, -11.88474067), (26.2, -13.05))
        make_face()
    extrude(amount=CUT_EXTRUDE7_DEPTH, mode=Mode.SUBTRACT)


solid = part_3.part
